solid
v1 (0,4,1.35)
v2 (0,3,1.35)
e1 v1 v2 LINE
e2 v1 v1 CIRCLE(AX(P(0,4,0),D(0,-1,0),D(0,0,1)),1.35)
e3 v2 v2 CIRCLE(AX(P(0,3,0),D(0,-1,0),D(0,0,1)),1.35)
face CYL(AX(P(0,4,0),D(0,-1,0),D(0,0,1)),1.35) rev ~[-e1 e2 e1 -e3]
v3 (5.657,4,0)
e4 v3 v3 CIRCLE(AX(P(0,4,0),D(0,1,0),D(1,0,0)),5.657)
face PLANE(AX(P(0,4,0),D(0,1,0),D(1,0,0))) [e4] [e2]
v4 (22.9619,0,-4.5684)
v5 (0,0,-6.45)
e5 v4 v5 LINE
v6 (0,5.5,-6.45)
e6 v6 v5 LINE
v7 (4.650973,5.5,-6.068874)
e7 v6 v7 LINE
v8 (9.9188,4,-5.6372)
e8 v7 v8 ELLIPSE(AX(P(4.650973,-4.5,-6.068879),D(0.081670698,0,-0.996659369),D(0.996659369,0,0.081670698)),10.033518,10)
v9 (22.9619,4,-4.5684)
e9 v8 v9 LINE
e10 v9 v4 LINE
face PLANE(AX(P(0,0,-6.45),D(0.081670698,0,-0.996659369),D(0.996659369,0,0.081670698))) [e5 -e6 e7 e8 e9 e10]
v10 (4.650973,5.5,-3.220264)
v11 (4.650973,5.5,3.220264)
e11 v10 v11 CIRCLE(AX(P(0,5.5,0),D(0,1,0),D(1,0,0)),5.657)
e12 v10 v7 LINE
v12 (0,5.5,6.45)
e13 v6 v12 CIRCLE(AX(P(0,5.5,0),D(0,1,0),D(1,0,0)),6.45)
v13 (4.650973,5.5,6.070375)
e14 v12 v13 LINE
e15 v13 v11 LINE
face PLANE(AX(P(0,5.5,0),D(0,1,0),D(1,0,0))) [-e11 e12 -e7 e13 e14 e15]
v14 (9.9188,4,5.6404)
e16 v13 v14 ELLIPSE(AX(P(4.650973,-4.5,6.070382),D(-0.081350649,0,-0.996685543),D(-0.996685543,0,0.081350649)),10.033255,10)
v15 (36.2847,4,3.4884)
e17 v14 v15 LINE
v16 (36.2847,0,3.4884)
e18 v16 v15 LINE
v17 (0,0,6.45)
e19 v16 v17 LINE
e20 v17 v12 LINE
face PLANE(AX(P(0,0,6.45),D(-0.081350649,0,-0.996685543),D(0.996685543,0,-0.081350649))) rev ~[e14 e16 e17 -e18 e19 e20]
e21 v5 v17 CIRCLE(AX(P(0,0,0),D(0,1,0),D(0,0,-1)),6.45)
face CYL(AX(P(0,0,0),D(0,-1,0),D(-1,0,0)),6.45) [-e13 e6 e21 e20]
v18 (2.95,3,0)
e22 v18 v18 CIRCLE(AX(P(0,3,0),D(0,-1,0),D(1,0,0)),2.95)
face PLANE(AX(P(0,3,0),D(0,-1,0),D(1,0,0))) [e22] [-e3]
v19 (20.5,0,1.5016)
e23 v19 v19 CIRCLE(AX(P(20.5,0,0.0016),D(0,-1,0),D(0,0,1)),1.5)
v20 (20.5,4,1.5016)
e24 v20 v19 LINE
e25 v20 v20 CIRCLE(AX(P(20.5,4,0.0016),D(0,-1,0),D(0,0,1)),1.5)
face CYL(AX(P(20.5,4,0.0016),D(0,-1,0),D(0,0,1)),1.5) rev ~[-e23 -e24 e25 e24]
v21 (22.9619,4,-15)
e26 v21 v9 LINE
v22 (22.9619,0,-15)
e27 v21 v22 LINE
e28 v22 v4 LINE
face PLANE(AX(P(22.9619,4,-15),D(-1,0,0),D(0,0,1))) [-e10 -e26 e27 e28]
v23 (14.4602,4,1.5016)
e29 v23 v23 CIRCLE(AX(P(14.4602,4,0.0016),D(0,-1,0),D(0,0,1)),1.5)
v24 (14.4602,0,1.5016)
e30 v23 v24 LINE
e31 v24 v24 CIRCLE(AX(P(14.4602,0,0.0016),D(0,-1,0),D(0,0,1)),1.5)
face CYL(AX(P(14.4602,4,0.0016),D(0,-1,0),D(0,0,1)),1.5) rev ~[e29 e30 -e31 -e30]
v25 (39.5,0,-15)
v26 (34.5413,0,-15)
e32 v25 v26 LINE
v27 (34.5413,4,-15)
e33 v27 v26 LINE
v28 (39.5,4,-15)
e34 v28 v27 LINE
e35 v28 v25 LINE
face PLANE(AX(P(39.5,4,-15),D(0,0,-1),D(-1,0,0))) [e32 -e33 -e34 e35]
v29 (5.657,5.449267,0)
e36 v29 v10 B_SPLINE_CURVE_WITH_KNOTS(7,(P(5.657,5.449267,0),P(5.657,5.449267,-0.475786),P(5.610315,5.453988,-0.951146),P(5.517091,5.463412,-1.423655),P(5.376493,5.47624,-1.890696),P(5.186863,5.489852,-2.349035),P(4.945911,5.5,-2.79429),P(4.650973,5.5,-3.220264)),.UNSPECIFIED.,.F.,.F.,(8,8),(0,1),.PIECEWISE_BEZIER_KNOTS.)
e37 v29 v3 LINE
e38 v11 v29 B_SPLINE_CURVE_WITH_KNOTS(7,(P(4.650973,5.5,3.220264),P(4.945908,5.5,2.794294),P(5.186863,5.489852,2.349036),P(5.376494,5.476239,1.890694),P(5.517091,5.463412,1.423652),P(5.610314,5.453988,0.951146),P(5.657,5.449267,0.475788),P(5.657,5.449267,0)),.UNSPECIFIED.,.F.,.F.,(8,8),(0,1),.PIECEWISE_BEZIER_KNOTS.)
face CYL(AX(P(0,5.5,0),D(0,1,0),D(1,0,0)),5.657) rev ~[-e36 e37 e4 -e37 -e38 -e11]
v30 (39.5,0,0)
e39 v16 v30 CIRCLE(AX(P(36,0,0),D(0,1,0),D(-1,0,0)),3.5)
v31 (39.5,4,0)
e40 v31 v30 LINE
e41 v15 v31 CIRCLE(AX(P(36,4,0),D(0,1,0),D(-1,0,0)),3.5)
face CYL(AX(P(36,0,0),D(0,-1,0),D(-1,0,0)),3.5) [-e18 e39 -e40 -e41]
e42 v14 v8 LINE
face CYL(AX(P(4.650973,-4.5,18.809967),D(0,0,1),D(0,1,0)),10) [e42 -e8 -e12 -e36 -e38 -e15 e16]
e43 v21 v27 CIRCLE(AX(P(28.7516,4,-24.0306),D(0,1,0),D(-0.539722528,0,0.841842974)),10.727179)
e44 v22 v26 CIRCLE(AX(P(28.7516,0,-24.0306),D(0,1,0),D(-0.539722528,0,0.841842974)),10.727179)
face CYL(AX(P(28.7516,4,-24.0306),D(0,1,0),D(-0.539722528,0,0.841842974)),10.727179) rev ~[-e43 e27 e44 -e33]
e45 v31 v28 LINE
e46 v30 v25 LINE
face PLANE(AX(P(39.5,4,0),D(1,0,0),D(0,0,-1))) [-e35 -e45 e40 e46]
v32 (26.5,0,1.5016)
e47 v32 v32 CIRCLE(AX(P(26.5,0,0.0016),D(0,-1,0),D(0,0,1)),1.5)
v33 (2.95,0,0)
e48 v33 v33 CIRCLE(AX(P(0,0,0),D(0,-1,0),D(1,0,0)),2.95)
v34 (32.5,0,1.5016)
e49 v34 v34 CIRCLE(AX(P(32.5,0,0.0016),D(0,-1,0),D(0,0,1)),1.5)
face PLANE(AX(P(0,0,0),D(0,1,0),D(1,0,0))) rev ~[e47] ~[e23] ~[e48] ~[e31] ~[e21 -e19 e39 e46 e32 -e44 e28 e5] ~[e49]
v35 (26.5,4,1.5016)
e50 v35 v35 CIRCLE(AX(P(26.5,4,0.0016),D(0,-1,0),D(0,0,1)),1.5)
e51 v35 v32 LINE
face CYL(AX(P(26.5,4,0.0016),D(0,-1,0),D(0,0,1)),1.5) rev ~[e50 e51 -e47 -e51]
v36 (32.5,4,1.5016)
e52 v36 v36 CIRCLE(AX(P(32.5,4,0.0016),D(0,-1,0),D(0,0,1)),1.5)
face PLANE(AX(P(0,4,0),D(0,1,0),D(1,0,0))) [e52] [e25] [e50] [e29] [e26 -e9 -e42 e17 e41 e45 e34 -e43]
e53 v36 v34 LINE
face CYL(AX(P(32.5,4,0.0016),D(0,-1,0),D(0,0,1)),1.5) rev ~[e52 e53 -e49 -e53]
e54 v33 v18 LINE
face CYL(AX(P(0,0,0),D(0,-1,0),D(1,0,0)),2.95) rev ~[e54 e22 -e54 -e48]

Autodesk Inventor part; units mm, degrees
ref_plane "YZ Plane" through (0, 0, 0) normal (1, 0, 0) x (0, 1, 0)
ref_plane "XZ Plane" through (0, 0, 0) normal (0, 1, 0) x (-1, 0, 0)
ref_plane "XY Plane" through (0, 0, 0) normal (0, 0, 1) x (1, 0, 0)
sketch "Sketch1" plane through (0, 0, 0) normal (0, 1, 0) x (-1, 0, 0)
  circle A0 centre (0, 0) radius 6.45
  circle A1 centre (0, 0) radius 5.657
  circle A2 centre (0, 0) radius 2.85
  line L0 (0, 0) -> (-36, 0) construction
  circle A3 centre (-36, 0) radius 3.5
  line L1 (0, -6.45) -> (-36, -3.5)
  line L2 (0, 6.45) -> (-36.2847, 3.4884)
  dimension "d0" = 12.9
  dimension "d1" = 11.314
  dimension "d2" = 5.7
  dimension "d3" = 36
  dimension "d4" = 7
extrude "Extrusion1" add sketch "Sketch1" along normal blind 4 contours A0 L1 L2 | A0 L1 A3 L2 | A3 | A1 | A2
sketch "Sketch2" plane through (0, 4, 0) normal (0, 1, 0) x (1, 0, 0)
  circle A0 centre (0, 0) radius 6.45
  line L0 (36, 3.5) -> (0, 6.45) projected
  line L1 (0, -6.45) -> (36.2847, -3.4884) projected
  arc A1 (0, 6.45) -> (0, -6.45) centre (0, 0) ccw
  line L2 (9.9188, -5.6404) -> (9.9188, 5.6372)
  line L3 (9.9188, 5.6372) -> (0, 6.45)
  line L4 (0, -6.45) -> (9.9188, -5.6404)
  dimension "d7" = 12.9
extrude "Extrusion2" add sketch "Sketch2" along normal blind 1.5 contours L0 A0 L1 | L0 L2 L1 A0
fillet "Fillet1" radius 10 1 edges at (9.9188, 5.5, 0.0016)
sketch "Sketch3" plane through (0, 5.5, 0) normal (0, 1, 0) x (1, 0, 0)
  circle A0 centre (0, 0) radius 5.657
  dimension "d11" = 11.314
extrude "Extrusion3" cut sketch "Sketch3" against normal blind 1.5
sketch "Sketch4" plane through (0, 4, 0) normal (0, 1, 0) x (1, 0, 0)
  circle A0 centre (0, 0) radius 2.9
  dimension "d14" = 5.8
sketch "Sketch5" plane through (0, 0, 0) normal (0, -1, 0) x (1, 0, 0)
  circle A0 centre (0, 0) radius 2.95
  dimension "d15" = 5.9
extrude "Extrusion4" cut sketch "Sketch5" against normal blind 3
sketch "Sketch6" plane through (0, 4, 0) normal (0, 1, 0) x (1, 0, 0)
  circle A0 centre (0, 0) radius 1.35
  dimension "d18" = 2.7
hole "Hole1" at (0, 4, 0) direction (0, -1, 0) diameter 2.7 end through all
sketch "Sketch7" plane through (0, 0, 0) normal (0, -1, 0) x (1, 0, 0)
  point P0 (0, 0)
sketch "Sketch8" plane through (0, 4, 0) normal (0, 1, 0) x (1, 0, 0)
  line L0 (9.9188, 5.6372) -> (9.9188, -5.6404) construction
  line L1 (9.9188, -0.0016) -> (39.5, -0.0016) construction
  arc A0 (36.2847, -3.4884) -> (36, 3.5) centre (36, 0) ccw construction
  line L2 (32.5, -0.0016) -> (26.5, -0.0016) construction
  circle A1 centre (26.5, -0.0016) radius 1.5 construction
  line L3 (26.5, -0.0016) -> (20.5, -0.0016) construction
  circle A2 centre (20.5, -0.0016) radius 1.5 construction
  circle A3 centre (32.5, -0.0016) radius 1.5 construction
  circle A4 centre (32.5, -0.0016) radius 1.5 construction
  circle A5 centre (32.5, -0.0016) radius 1.5
  circle A6 centre (26.5, -0.0016) radius 1.5
  circle A7 centre (20.5, -0.0016) radius 1.5
  point P0 (0, 0)
  dimension "d27" = 6
  dimension "d28" = 3
  dimension "d29" = 6
  dimension "d30" = 3
  dimension "d31" = 3
  dimension "d32" = 3
  dimension "d33" = 3
  dimension "d34" = 3
hole "Hole2" at (20.5, 4, 0.0016) at (26.5, 4, 0.0016) at (32.5, 4, 0.0016) direction (0, -1, 0) diameter 3 end through all
sketch "Sketch9" plane through (0, 4, 0) normal (0, 1, 0) x (1, 0, 0)
  arc A0 (36.2847, -3.4884) -> (36, 3.5) centre (36, 0) ccw projected
  line L0 (39.5, 0) -> (39.5, 15)
  line L1 (39.5, 15) -> (22.9619, 15)
  line L2 (22.9619, 15) -> (22.9619, 4.5684)
  line L3 (36, 3.5) -> (0, 6.45) projected
  point P0 (0, 0)
  dimension "d46" = 15
extrude "Extrusion5" add sketch "Sketch9" against normal blind 4
sketch "Sketch10" plane through (0, 4, 0) normal (0, 1, 0) x (1, 0, 0)
  line L0 (39.5, 15) -> (22.9619, 15)
  line L1 (22.9619, 15) -> (39.5, 15) projected
  line L2 (22.9619, 15) -> (39.5, 15) projected
  arc A0 (23.6935, 15) -> (35.6591, 15) centre (29.6763, 28.5077) ccw
  point P0 (0, 0)
extrude "Extrusion6" [suppressed]
sketch "Sketch11" plane through (0, 4, 0) normal (0, 1, 0) x (1, 0, 0)
  circle A0 centre (20.5, -0.0016) radius 1.5 construction
  line L0 (19, -0.0016) -> (16, -0.0016) construction
  circle A1 centre (14.4602, -0.0016) radius 1.5 construction
  circle A2 centre (14.4602, -0.0016) radius 1.5
  point P0 (0, 0)
  dimension "d47" = 3
  dimension "d48" = 3
hole "Hole3" at (14.4602, 4, 0.0016) direction (0, -1, 0) diameter 3 end through all
sketch "Sketch12" plane through (0, 4, 0) normal (0, 1, 0) x (1, 0, 0)
  line L0 (39.5, 15) -> (22.9619, 15)
  line L1 (22.9619, 15) -> (39.5, 15) projected
  arc A0 (22.9619, 15) -> (34.5413, 15) centre (28.7516, 24.0306) ccw
  point P0 (0, 0)
extrude "Extrusion7" cut sketch "Sketch12" against normal blind 4
properties part number "servo_arm_3"
